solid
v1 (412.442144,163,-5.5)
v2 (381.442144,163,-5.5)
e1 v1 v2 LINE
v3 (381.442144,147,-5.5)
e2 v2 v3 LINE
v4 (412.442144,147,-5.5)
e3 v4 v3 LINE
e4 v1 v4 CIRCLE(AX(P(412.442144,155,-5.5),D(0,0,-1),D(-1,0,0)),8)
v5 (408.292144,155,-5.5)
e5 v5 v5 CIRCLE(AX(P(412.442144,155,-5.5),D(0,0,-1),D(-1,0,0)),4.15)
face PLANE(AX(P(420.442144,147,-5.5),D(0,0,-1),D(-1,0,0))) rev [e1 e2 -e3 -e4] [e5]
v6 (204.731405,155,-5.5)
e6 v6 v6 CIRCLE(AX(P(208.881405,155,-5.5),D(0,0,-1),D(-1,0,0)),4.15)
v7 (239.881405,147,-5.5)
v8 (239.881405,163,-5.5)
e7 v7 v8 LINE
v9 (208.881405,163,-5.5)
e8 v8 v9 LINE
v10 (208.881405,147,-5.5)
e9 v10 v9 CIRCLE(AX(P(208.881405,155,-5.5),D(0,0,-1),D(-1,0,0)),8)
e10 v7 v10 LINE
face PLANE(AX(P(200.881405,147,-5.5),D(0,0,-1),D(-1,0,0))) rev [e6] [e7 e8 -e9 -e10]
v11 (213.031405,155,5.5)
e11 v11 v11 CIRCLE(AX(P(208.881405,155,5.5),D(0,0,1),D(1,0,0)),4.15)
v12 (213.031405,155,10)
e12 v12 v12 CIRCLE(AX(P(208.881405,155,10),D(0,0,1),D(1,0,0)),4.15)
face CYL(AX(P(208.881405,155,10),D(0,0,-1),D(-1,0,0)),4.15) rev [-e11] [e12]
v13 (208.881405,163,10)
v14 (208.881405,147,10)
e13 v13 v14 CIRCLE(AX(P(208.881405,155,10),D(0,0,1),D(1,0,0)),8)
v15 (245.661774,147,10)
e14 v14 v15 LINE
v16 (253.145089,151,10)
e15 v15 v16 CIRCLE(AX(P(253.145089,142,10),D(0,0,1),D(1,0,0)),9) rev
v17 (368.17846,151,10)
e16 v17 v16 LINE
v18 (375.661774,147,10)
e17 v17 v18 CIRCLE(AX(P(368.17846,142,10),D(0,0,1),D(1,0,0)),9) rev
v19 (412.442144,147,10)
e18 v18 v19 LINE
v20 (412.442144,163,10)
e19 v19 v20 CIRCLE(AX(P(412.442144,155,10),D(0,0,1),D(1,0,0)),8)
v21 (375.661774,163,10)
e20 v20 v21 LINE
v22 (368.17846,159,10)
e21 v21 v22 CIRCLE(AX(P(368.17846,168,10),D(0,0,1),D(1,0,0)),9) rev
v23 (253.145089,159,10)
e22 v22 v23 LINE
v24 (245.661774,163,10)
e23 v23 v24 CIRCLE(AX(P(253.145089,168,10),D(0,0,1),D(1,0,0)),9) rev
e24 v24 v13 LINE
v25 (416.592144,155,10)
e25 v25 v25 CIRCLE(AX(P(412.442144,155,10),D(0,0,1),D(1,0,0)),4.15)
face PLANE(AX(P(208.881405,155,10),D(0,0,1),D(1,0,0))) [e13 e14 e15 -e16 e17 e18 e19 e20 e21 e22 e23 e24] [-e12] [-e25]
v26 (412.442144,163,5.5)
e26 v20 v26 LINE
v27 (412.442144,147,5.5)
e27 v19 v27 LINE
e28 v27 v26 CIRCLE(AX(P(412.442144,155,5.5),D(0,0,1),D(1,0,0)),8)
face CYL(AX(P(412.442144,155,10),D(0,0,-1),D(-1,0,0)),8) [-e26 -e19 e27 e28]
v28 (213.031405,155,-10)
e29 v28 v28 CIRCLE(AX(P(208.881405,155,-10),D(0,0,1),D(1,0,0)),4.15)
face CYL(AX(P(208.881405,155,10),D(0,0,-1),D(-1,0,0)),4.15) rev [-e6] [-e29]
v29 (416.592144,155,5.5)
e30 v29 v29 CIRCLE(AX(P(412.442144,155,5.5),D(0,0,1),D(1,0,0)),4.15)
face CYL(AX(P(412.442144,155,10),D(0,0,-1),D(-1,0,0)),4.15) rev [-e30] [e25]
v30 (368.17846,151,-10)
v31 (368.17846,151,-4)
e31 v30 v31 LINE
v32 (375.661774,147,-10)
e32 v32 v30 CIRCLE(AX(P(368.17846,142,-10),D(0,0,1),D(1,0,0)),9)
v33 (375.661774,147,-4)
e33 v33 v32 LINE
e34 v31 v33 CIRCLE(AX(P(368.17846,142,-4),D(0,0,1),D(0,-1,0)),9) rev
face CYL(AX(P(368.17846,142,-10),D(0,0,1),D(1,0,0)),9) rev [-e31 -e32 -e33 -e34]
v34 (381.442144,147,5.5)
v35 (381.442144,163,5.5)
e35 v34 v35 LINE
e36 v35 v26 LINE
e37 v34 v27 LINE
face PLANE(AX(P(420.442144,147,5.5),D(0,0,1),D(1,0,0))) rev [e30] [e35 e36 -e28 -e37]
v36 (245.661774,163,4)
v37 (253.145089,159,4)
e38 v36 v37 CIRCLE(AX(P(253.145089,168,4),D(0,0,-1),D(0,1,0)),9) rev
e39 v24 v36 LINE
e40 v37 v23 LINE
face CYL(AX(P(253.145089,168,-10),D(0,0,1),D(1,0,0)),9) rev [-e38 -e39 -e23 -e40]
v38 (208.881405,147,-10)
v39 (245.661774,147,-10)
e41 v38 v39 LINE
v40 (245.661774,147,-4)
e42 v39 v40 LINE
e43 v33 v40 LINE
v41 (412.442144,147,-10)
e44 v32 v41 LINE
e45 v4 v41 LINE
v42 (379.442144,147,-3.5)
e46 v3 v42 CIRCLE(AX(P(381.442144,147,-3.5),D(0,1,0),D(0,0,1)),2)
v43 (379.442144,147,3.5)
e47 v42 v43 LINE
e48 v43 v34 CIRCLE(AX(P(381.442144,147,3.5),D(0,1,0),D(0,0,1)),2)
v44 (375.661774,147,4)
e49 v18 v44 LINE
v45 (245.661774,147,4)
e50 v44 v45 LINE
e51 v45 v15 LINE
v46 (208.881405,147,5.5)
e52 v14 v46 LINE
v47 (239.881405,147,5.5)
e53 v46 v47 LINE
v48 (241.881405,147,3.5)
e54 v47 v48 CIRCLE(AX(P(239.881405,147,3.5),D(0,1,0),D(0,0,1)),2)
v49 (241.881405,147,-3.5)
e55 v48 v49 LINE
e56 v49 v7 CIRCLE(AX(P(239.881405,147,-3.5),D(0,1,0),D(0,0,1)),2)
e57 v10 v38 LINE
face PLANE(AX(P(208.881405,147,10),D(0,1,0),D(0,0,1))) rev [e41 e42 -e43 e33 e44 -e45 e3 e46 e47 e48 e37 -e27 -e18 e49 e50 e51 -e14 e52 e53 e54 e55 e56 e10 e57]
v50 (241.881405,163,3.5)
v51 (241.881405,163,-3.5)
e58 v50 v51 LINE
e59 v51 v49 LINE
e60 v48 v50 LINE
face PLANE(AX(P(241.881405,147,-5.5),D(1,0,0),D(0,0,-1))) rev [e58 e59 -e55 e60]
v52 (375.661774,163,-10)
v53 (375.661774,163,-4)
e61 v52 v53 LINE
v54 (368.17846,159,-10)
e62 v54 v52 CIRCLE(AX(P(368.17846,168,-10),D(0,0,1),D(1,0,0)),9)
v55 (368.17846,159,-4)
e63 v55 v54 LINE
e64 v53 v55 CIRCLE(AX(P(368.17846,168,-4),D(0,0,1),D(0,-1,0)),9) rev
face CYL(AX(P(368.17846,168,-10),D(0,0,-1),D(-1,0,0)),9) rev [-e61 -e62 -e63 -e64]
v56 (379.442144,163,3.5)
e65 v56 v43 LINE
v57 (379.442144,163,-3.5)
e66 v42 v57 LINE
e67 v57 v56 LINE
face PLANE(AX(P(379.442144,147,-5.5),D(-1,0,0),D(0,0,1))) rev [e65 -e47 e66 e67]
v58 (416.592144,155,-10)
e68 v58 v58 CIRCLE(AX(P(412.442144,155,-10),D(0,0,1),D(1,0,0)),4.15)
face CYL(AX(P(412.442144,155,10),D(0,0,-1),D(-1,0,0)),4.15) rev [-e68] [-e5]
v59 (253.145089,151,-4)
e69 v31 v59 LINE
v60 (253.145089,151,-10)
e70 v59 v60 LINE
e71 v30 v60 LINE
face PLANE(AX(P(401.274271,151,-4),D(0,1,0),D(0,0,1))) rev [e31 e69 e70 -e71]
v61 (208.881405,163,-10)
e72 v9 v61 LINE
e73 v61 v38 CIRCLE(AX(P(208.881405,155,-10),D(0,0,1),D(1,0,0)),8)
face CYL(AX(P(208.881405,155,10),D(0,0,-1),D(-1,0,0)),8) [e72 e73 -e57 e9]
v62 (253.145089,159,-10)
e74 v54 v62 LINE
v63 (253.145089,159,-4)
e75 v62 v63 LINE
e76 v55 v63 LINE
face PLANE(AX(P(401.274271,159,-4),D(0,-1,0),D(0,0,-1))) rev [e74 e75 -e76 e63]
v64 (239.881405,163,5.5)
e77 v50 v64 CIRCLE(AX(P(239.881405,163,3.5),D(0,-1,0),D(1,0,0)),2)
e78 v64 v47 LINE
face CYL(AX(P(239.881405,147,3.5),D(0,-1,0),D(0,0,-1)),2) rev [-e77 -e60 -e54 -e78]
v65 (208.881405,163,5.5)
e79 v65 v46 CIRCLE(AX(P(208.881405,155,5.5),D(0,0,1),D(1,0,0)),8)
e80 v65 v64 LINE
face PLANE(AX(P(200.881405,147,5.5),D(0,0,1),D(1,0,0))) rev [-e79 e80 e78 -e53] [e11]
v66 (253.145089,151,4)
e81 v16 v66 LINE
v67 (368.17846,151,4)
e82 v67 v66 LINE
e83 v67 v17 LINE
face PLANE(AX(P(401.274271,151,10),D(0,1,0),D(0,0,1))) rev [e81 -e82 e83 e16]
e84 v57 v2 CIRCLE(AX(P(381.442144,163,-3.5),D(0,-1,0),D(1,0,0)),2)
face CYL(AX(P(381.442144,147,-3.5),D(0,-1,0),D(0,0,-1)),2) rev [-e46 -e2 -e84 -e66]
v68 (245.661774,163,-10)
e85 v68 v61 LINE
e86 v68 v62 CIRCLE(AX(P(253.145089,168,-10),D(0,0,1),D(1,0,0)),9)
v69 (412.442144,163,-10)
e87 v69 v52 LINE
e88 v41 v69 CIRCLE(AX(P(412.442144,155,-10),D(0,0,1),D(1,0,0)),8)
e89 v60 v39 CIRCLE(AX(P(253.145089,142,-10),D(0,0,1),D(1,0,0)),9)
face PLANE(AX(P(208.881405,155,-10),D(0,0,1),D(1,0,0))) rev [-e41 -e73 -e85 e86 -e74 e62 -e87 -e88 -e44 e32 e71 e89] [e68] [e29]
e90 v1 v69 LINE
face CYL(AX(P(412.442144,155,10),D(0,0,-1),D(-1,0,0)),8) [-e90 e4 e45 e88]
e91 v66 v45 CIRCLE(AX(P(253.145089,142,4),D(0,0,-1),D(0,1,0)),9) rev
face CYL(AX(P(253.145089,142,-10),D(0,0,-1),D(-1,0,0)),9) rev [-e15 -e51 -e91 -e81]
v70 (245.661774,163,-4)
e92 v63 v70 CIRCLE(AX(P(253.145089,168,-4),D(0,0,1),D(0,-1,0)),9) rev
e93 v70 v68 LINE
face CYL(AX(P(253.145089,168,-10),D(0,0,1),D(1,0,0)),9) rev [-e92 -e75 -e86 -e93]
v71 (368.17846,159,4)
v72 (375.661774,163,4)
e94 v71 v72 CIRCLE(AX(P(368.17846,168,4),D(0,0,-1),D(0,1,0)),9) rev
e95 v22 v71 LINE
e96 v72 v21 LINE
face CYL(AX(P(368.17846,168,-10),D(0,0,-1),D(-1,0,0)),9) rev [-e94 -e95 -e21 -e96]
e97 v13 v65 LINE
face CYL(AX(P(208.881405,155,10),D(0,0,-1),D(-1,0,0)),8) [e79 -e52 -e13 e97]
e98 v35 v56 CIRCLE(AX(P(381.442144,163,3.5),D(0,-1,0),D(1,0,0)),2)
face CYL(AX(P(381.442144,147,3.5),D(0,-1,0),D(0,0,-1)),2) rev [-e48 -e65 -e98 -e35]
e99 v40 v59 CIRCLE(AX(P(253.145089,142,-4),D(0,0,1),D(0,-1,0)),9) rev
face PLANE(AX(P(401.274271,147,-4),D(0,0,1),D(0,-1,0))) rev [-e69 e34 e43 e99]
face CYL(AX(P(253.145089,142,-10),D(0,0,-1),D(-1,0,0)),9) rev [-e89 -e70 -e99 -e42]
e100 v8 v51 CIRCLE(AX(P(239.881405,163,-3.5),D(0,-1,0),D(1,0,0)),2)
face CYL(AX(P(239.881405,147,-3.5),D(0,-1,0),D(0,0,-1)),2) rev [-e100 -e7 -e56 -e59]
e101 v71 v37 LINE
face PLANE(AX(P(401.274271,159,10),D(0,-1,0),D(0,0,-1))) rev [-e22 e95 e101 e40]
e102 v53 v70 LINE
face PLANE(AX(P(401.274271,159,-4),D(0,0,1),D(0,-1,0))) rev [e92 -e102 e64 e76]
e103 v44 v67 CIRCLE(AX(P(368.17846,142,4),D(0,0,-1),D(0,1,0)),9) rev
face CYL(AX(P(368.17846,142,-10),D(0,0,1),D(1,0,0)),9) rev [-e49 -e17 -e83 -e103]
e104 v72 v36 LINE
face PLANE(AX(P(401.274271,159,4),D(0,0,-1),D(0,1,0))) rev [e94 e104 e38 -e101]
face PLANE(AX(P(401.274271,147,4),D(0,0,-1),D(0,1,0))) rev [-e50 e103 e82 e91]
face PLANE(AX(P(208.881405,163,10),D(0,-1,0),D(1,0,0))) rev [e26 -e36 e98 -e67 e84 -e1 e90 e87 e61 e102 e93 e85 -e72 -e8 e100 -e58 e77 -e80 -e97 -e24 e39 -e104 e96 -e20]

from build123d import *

# Parameters (mm, degrees)
ESBO_O1_R                = 4.15
RESSALTO_EXTRUS_O1_DEPTH = 10
ESBO_O2_W                = 41
ESBO_O2_H                = 11
CORTE_EXTRUS_O1_DEPTH    = 421.865295251
FILETE1_R                = 2
ESBO_O3_W                = 41
ESBO_O3_H                = 11
CORTE_EXTRUS_O2_DEPTH    = 421.865295251
ESBO_O4_W                = 130
ESBO_O4_H                = 51.333908156
CORTE_EXTRUS_O3_DEPTH    = 452.376336051
RESSALTO_EXTRUS_O2_DEPTH = 130
FILETE2_R                = 9
FILETE3_R                = 2


with BuildPart() as part:
    # Esboço1 → Ressalto-extrusão1 (new, symmetric)
    with BuildSketch(Plane.XY):
        with BuildLine():
            Line((208.88140452, 163), (412.442144352, 163))
            ThreePointArc((412.442144352, 163), (420.442144352, 155), (412.442144352, 147))
            Line((412.442144352, 147), (208.88140452, 147))
            ThreePointArc((208.88140452, 147), (200.88140452, 155), (208.88140452, 163))
        make_face()
        with Locations((208.88140452, 155)):
            Circle(ESBO_O1_R, mode=Mode.SUBTRACT)
        with Locations((412.442144352, 155)):
            Circle(ESBO_O1_R, mode=Mode.SUBTRACT)
    extrude(amount=RESSALTO_EXTRUS_O1_DEPTH, both=True)

    # Esboço2 → Corte-extrusão1 (cut, through all)
    with BuildSketch(Plane(origin=(0, 163, 0), x_dir=(1, 0, 0), z_dir=(0, 1, 0))):
        with Locations((221.38140452, 0)):
            Rectangle(ESBO_O2_W, ESBO_O2_H)
    extrude(amount=-CORTE_EXTRUS_O1_DEPTH, mode=Mode.SUBTRACT)

    # Filete1
    filete1_edges = [part.edges().sort_by_distance(p)[0] for p in [
        (241.88140452, 155, 5.5),
        (241.88140452, 155, -5.5),
    ]]
    fillet(filete1_edges, radius=FILETE1_R)

    # Esboço3 → Corte-extrusão2 (cut, through all)
    with BuildSketch(Plane(origin=(0, 163, 0), x_dir=(1, 0, 0), z_dir=(0, 1, 0))):
        with Locations((399.942144352, 0)):
            Rectangle(ESBO_O3_W, ESBO_O3_H)
    extrude(amount=-CORTE_EXTRUS_O2_DEPTH, mode=Mode.SUBTRACT)

    # Esboço4 → Corte-extrusão3 (cut, through all)
    with BuildSketch(Plane.XY.offset(10)):
        with Locations((310.661774436, 149.883332027)):
            Rectangle(ESBO_O4_W, ESBO_O4_H)
    extrude(amount=-CORTE_EXTRUS_O3_DEPTH, mode=Mode.SUBTRACT)


with BuildPart() as corte_extrus_o3_piece_1:
    # of the separate pieces the step leaves, piece 1, a body of its own (corte_extrus_o3_pieces)
    add(part.part.solids().sort_by_distance((241.88140452, 163, -3.5))[0])



with BuildPart() as corte_extrus_o3_piece_2:
    # of the separate pieces the step leaves, piece 2, a body of its own (corte_extrus_o3_pieces)
    add(part.part.solids().sort_by_distance((375.661774436, 163, -10))[0])


with BuildPart() as corte_extrus_o3_piece_1_1:
    add(corte_extrus_o3_piece_1.part)

    add(corte_extrus_o3_piece_2.part)  # Ressalto-extrusão2 merges Corte-extrusão3 piece 2
    # Esboço5 → Ressalto-extrusão2 (add)
    with BuildSketch(Plane(origin=(245.661774436, 0, 0), x_dir=(0, 0, -1), z_dir=(1, 0, 0))):
        Polygon((-4, 147), (-4, 151), (-10, 151), (-10, 159), (-4, 159), (-4, 163), (4, 163), (4, 159), (10, 159), (10, 151), (4, 151), (4, 147), align=None)
    extrude(amount=RESSALTO_EXTRUS_O2_DEPTH)

    # Filete2
    # the kernel refuses this fillet: 9 mm, written as the material it adds along each edge
    with BuildSketch(Plane(origin=(375.661774436, 151, -10), x_dir=(0, -1, 0), z_dir=(0, 0, 1))) as filete2_piece_1_section:
        with BuildLine():
            CenterArc((9, -7.483314774), FILETE2_R, 123.748988596, 56.251011404)
            Line((0, -7.483314774), (-0.18, -7.483314774))
            Line((-0.18, -7.483314774), (-0.18, 0))
            Line((-0.18, 0), (0, 0.18))
            ThreePointArc((0, 0.18), (2, 0.18), (3.9, 0.149666295))
            Line((3.9, 0.149666295), (4, 0))
        make_face()
    filete2_piece_1 = extrude(amount=24.708286934, mode=Mode.PRIVATE)
    filete2_piece_1 = split(filete2_piece_1, bisect_by=Plane(origin=(373.762740139, 149.968595049, 10), z_dir=(0, 0, -1)), keep=Keep.TOP, mode=Mode.PRIVATE)
    add(filete2_piece_1)
    with BuildSketch(Plane(origin=(375.661774436, 151, -14.708286934), x_dir=(0, -1, 0), z_dir=(0, 0, 1))) as filete2_piece_2_section:
        with BuildLine():
            CenterArc((9, -7.483314774), FILETE2_R, 123.748988596, 56.251011404)
            Line((0, -7.483314774), (-0.18, -7.483314774))
            Line((-0.18, -7.483314774), (-0.18, 0))
            Line((-0.18, 0), (0, 0.18))
            ThreePointArc((0, 0.18), (2, 0.18), (3.9, 0.149666295))
            Line((3.9, 0.149666295), (4, 0))
        make_face()
    filete2_piece_2 = extrude(amount=24.708286934, mode=Mode.PRIVATE)
    filete2_piece_2 = split(filete2_piece_2, bisect_by=Plane(origin=(373.762740139, 149.968595049, -10), z_dir=(0, 0, 1)), keep=Keep.TOP, mode=Mode.PRIVATE)
    add(filete2_piece_2)
    with BuildSketch(Plane(origin=(375.661774436, 159, 10), x_dir=(0, 1, 0), z_dir=(0, 0, -1))) as filete2_piece_3_section:
        with BuildLine():
            CenterArc((9, -7.483314774), FILETE2_R, 123.748988596, 56.251011404)
            Line((0, -7.483314774), (-0.18, -7.483314774))
            Line((-0.18, -7.483314774), (-0.18, 0))
            Line((-0.18, 0), (0, 0.18))
            ThreePointArc((0, 0.18), (2, 0.18), (3.9, 0.149666295))
            Line((3.9, 0.149666295), (4, 0))
        make_face()
    filete2_piece_3 = extrude(amount=24.708286934, mode=Mode.PRIVATE)
    filete2_piece_3 = split(filete2_piece_3, bisect_by=Plane(origin=(373.762740139, 160.031404951, -10), z_dir=(0, 0, 1)), keep=Keep.TOP, mode=Mode.PRIVATE)
    add(filete2_piece_3)
    with BuildSketch(Plane(origin=(375.661774436, 159, 14.708286934), x_dir=(0, 1, 0), z_dir=(0, 0, -1))) as filete2_piece_4_section:
        with BuildLine():
            CenterArc((9, -7.483314774), FILETE2_R, 123.748988596, 56.251011404)
            Line((0, -7.483314774), (-0.18, -7.483314774))
            Line((-0.18, -7.483314774), (-0.18, 0))
            Line((-0.18, 0), (0, 0.18))
            ThreePointArc((0, 0.18), (2, 0.18), (3.9, 0.149666295))
            Line((3.9, 0.149666295), (4, 0))
        make_face()
    filete2_piece_4 = extrude(amount=24.708286934, mode=Mode.PRIVATE)
    filete2_piece_4 = split(filete2_piece_4, bisect_by=Plane(origin=(373.762740139, 160.031404951, 10), z_dir=(0, 0, -1)), keep=Keep.TOP, mode=Mode.PRIVATE)
    add(filete2_piece_4)
    with BuildSketch(Plane(origin=(245.661774436, 151, -10), x_dir=(1, 0, 0), z_dir=(0, 0, 1))) as filete2_piece_5_section:
        with BuildLine():
            CenterArc((7.483314774, -9), FILETE2_R, 90, 56.251011404)
            Line((0, -4), (-0.149666295, -3.9))
            ThreePointArc((-0.149666295, -3.9), (-0.18, -2), (-0.18, 0))
            Line((-0.18, 0), (0, 0.18))
            Line((0, 0.18), (7.483314774, 0.18))
            Line((7.483314774, 0.18), (7.483314774, 0))
        make_face()
    filete2_piece_5 = extrude(amount=24.708286934, mode=Mode.PRIVATE)
    filete2_piece_5 = split(filete2_piece_5, bisect_by=Plane(origin=(247.560808733, 149.968595049, 10), z_dir=(0, 0, -1)), keep=Keep.TOP, mode=Mode.PRIVATE)
    add(filete2_piece_5)
    with BuildSketch(Plane(origin=(245.661774436, 151, -14.708286934), x_dir=(1, 0, 0), z_dir=(0, 0, 1))) as filete2_piece_6_section:
        with BuildLine():
            CenterArc((7.483314774, -9), FILETE2_R, 90, 56.251011404)
            Line((0, -4), (-0.149666295, -3.9))
            ThreePointArc((-0.149666295, -3.9), (-0.18, -2), (-0.18, 0))
            Line((-0.18, 0), (0, 0.18))
            Line((0, 0.18), (7.483314774, 0.18))
            Line((7.483314774, 0.18), (7.483314774, 0))
        make_face()
    filete2_piece_6 = extrude(amount=24.708286934, mode=Mode.PRIVATE)
    filete2_piece_6 = split(filete2_piece_6, bisect_by=Plane(origin=(247.560808733, 149.968595049, -10), z_dir=(0, 0, 1)), keep=Keep.TOP, mode=Mode.PRIVATE)
    add(filete2_piece_6)
    with BuildSketch(Plane(origin=(245.661774436, 159, 14.708286934), x_dir=(1, 0, 0), z_dir=(0, 0, -1))) as filete2_piece_7_section:
        with BuildLine():
            CenterArc((7.483314774, -9), FILETE2_R, 90, 56.251011404)
            Line((0, -4), (-0.149666295, -3.9))
            ThreePointArc((-0.149666295, -3.9), (-0.18, -2), (-0.18, 0))
            Line((-0.18, 0), (0, 0.18))
            Line((0, 0.18), (7.483314774, 0.18))
            Line((7.483314774, 0.18), (7.483314774, 0))
        make_face()
    filete2_piece_7 = extrude(amount=24.708286934, mode=Mode.PRIVATE)
    filete2_piece_7 = split(filete2_piece_7, bisect_by=Plane(origin=(247.560808733, 160.031404951, 10), z_dir=(0, 0, -1)), keep=Keep.TOP, mode=Mode.PRIVATE)
    add(filete2_piece_7)
    with BuildSketch(Plane(origin=(245.661774436, 159, 10), x_dir=(0, 1, 0), z_dir=(0, 0, -1))) as filete2_piece_8_section:
        with BuildLine():
            CenterArc((9, 7.483314774), FILETE2_R, 180, 56.251011404)
            Line((0, 7.483314774), (-0.18, 7.483314774))
            Line((-0.18, 7.483314774), (-0.18, 0))
            Line((-0.18, 0), (0, -0.18))
            ThreePointArc((0, -0.18), (2, -0.18), (3.9, -0.149666295))
            Line((3.9, -0.149666295), (4, 0))
        make_face()
    filete2_piece_8 = extrude(amount=24.708286934, mode=Mode.PRIVATE)
    filete2_piece_8 = split(filete2_piece_8, bisect_by=Plane(origin=(247.560808733, 160.031404951, -10), z_dir=(0, 0, 1)), keep=Keep.TOP, mode=Mode.PRIVATE)
    add(filete2_piece_8)

    # Filete3
    filete3_edges = [corte_extrus_o3_piece_1_1.edges().sort_by_distance(p)[0] for p in [
        (379.442144352, 155, 5.5),
        (379.442144352, 155, -5.5),
    ]]
    fillet(filete3_edges, radius=FILETE3_R)


solid = corte_extrus_o3_piece_1_1.part
